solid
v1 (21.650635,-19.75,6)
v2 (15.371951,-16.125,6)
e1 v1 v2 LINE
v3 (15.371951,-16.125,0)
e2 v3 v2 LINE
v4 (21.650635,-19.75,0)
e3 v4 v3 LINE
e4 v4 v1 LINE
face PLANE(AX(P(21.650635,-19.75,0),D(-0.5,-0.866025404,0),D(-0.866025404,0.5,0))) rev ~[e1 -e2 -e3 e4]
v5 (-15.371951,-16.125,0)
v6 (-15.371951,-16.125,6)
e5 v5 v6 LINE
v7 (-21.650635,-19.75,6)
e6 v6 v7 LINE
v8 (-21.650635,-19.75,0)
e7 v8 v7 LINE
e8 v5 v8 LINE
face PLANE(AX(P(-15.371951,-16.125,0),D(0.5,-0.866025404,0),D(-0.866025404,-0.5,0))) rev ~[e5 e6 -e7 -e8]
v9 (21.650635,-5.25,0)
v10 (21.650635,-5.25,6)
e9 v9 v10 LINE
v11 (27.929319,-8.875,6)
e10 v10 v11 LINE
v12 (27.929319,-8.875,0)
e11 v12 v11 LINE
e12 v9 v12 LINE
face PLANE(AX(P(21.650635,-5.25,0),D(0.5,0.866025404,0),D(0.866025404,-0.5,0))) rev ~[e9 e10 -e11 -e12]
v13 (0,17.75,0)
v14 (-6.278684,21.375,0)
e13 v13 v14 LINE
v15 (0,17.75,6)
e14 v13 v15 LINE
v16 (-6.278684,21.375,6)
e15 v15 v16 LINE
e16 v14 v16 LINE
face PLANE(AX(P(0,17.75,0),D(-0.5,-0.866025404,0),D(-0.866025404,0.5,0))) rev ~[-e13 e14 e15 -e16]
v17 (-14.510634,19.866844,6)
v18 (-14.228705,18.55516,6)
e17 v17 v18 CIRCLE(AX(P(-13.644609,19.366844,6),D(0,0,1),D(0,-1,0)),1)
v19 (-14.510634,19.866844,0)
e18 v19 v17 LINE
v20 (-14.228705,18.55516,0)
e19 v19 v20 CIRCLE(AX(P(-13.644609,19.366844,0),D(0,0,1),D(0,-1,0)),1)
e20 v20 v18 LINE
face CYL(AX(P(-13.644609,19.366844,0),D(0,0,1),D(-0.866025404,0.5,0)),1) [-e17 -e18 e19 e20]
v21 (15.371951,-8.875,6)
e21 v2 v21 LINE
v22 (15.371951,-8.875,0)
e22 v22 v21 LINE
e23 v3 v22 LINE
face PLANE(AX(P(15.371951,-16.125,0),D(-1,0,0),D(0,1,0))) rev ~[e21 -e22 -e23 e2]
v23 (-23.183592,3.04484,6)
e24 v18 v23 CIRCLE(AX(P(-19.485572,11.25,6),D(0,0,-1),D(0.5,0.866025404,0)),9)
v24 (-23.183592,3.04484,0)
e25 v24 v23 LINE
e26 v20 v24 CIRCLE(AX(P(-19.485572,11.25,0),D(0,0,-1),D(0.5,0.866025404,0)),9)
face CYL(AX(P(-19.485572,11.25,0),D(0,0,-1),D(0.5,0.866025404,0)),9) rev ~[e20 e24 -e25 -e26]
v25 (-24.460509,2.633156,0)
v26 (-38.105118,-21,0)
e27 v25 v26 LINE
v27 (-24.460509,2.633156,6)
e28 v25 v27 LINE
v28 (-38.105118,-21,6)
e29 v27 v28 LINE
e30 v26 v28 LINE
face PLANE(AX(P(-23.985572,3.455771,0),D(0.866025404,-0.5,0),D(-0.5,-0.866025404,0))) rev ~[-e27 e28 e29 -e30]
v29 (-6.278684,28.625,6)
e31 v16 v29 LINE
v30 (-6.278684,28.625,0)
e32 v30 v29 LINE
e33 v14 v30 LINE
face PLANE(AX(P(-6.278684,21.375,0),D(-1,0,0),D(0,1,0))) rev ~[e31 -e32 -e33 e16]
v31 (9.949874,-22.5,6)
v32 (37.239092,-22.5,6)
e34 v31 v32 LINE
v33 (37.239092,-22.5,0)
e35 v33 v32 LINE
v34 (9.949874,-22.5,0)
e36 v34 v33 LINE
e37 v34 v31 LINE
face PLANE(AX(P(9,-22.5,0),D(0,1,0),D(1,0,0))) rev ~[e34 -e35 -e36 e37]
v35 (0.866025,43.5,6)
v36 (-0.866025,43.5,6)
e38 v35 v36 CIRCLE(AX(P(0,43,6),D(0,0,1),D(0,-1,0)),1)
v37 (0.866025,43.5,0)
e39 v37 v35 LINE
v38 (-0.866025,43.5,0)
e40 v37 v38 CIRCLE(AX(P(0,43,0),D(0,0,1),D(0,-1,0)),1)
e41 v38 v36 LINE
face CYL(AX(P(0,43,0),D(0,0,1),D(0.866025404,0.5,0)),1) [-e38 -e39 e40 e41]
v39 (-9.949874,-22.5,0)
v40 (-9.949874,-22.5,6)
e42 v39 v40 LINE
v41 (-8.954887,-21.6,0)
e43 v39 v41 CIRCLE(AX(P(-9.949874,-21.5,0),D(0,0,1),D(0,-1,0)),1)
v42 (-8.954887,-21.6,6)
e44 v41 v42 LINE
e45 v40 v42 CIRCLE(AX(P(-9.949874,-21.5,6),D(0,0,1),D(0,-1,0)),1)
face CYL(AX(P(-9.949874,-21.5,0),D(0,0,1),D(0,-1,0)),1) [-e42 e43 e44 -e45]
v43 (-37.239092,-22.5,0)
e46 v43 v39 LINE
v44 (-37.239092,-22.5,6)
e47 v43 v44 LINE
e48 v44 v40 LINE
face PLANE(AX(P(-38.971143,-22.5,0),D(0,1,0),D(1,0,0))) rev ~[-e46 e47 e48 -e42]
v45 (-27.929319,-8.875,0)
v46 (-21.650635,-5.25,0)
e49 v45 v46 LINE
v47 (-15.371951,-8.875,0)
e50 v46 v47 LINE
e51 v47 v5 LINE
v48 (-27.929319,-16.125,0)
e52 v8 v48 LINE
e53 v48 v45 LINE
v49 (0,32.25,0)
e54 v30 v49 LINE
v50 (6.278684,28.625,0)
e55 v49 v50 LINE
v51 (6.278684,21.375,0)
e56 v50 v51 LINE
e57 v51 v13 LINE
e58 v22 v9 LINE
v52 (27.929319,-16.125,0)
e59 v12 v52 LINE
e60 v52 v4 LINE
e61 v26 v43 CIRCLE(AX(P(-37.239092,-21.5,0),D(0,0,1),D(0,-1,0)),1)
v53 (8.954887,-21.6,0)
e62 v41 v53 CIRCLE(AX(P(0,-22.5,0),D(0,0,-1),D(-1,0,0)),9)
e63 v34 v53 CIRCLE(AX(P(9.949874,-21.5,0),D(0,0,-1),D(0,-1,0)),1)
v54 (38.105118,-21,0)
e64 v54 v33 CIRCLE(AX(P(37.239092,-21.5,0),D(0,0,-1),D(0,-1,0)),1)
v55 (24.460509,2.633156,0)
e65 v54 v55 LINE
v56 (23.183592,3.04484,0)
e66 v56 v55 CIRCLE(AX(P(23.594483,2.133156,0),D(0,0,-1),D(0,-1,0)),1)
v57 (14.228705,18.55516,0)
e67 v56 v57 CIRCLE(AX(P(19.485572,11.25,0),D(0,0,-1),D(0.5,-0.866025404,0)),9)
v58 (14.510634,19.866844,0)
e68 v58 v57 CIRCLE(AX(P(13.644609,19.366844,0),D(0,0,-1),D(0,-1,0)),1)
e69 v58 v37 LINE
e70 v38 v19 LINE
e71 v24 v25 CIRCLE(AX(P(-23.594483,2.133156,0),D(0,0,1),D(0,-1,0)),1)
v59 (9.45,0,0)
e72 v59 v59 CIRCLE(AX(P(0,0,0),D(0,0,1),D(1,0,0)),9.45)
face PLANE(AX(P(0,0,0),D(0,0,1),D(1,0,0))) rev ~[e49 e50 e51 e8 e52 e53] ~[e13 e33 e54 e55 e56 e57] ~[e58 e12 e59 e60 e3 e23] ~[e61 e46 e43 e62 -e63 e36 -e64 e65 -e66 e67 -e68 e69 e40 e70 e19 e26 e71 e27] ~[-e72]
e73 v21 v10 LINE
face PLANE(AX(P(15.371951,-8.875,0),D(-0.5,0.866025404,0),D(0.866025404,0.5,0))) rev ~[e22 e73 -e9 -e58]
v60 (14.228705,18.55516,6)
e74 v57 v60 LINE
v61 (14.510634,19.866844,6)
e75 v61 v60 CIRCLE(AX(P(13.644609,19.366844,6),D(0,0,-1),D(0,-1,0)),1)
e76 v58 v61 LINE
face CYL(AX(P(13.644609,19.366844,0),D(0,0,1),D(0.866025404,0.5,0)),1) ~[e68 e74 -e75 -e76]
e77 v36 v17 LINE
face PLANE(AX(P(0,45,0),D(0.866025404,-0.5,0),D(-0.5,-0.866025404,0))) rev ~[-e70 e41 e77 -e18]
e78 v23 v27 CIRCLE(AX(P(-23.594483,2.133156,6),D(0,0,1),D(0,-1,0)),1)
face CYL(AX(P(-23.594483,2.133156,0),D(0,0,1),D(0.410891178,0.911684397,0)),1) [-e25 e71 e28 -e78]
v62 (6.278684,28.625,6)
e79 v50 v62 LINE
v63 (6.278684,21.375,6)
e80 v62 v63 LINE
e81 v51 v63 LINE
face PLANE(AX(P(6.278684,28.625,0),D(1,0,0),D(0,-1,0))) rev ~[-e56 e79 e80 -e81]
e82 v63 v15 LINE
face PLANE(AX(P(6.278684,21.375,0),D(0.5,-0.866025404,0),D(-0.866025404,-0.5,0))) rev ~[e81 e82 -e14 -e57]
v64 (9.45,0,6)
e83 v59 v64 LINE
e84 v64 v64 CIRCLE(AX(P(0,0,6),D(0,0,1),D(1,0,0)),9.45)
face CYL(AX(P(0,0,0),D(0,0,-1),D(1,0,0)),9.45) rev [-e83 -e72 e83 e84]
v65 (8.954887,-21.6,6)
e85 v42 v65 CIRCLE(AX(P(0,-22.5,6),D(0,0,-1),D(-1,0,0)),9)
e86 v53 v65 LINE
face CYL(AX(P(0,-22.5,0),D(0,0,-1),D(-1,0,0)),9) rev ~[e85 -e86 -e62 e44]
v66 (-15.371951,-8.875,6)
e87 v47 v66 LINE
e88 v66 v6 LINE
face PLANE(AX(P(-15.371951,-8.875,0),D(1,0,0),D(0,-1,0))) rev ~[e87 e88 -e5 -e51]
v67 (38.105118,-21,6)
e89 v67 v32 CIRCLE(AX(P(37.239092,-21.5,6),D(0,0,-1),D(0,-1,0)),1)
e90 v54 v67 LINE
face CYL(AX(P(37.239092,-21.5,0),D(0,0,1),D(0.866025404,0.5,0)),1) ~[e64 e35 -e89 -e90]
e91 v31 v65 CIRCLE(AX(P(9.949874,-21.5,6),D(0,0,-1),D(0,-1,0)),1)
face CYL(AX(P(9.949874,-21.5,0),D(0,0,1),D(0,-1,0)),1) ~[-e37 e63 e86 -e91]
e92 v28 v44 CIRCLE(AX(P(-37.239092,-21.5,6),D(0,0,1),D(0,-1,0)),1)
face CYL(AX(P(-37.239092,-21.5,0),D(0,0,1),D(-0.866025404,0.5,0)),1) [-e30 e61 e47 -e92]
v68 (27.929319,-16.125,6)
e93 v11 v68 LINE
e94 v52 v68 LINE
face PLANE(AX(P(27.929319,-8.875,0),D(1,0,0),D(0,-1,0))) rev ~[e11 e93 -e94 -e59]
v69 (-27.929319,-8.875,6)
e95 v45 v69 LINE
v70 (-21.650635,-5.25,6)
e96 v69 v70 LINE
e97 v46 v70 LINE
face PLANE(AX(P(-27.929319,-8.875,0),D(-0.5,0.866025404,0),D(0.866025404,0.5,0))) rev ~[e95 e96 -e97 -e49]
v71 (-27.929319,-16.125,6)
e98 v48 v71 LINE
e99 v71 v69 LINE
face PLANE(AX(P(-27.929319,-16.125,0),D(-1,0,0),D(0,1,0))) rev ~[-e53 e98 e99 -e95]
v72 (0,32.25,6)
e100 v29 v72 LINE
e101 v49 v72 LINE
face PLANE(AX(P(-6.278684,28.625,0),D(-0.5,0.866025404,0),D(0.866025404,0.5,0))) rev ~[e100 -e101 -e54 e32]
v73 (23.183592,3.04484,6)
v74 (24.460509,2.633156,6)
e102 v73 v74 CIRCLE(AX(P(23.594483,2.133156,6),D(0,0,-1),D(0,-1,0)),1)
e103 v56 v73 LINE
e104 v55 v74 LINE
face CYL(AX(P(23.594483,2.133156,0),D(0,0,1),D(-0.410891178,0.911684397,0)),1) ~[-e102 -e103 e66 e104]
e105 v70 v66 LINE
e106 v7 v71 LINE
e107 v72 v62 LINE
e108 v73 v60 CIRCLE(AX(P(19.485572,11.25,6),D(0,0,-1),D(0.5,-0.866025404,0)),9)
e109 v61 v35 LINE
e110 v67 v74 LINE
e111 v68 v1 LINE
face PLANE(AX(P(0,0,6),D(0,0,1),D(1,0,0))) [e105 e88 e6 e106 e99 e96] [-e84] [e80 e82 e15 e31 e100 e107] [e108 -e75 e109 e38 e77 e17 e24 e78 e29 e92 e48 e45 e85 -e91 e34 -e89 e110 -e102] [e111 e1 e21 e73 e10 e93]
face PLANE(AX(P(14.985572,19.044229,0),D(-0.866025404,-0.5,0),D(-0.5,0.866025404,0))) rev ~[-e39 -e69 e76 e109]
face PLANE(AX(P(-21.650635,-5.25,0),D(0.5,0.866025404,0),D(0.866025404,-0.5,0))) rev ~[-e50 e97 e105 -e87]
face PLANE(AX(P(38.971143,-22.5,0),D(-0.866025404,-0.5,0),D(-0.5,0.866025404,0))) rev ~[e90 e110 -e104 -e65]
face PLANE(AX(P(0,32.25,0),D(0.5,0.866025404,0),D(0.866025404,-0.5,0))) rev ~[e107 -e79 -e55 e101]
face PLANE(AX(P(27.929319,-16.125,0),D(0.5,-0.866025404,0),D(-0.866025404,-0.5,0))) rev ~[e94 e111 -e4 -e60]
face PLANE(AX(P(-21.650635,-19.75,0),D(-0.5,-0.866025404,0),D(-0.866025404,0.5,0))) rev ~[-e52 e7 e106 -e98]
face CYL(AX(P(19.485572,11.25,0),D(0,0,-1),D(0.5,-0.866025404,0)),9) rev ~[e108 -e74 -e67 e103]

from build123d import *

# Parameters (mm, degrees)
F0_R     = 9.45
F1_DEPTH = 6
F2_R     = 1
F3_R     = 1


with BuildPart() as f1:
    # F0 (on Top) → F1 (new body)
    with BuildSketch(Plane.XY):
        with BuildLine():
            Line((14.9855715851, 19.0442286341), (0, 45))
            Line((0, 45), (-14.9855715851, 19.0442286341))
            ThreePointArc((-14.9855715851, 19.0442286341), (-11.6913429511, 6.75), (-23.9855715851, 3.4557713659))
            Line((-23.9855715851, 3.4557713659), (-38.9711431703, -22.5))
            Line((-38.9711431703, -22.5), (-9, -22.5))
            ThreePointArc((-9, -22.5), (0, -13.5), (9, -22.5))
            Line((9, -22.5), (38.9711431703, -22.5))
            Line((38.9711431703, -22.5), (23.9855715851, 3.4557713659))
            ThreePointArc((23.9855715851, 3.4557713659), (11.6913429511, 6.75), (14.9855715851, 19.0442286341))
        make_face()
        Polygon((-15.3719509172, -16.125), (-21.6506350946, -19.75), (-27.929319272, -16.125), (-27.929319272, -8.875), (-21.6506350946, -5.25), (-15.3719509172, -8.875), align=None, mode=Mode.SUBTRACT)
        Polygon((21.6506350946, -5.25), (27.929319272, -8.875), (27.929319272, -16.125), (21.6506350946, -19.75), (15.3719509172, -16.125), (15.3719509172, -8.875), align=None, mode=Mode.SUBTRACT)
        Circle(F0_R, mode=Mode.SUBTRACT)
        Polygon((-6.2786841774, 28.625), (0, 32.25), (6.2786841774, 28.625), (6.2786841774, 21.375), (0, 17.75), (-6.2786841774, 21.375), align=None, mode=Mode.SUBTRACT)
    extrude(amount=F1_DEPTH)

    # F2
    f2_edges = [f1.edges().sort_by_distance(p)[0] for p in [
        (14.985572, 19.044229, 3),
        (-23.985572, 3.455771, 3),
        (9, -22.5, 3),
    ]]
    fillet(f2_edges, radius=F2_R)

    # F3
    f3_edges = [f1.edges().sort_by_distance(p)[0] for p in [
        (0, 45, 3),
        (38.971143, -22.5, 3),
        (-38.971143, -22.5, 3),
        (-14.985572, 19.044229, 3),
        (23.985572, 3.455771, 3),
        (-9, -22.5, 3),
    ]]
    fillet(f3_edges, radius=F3_R)


solid = f1.part
